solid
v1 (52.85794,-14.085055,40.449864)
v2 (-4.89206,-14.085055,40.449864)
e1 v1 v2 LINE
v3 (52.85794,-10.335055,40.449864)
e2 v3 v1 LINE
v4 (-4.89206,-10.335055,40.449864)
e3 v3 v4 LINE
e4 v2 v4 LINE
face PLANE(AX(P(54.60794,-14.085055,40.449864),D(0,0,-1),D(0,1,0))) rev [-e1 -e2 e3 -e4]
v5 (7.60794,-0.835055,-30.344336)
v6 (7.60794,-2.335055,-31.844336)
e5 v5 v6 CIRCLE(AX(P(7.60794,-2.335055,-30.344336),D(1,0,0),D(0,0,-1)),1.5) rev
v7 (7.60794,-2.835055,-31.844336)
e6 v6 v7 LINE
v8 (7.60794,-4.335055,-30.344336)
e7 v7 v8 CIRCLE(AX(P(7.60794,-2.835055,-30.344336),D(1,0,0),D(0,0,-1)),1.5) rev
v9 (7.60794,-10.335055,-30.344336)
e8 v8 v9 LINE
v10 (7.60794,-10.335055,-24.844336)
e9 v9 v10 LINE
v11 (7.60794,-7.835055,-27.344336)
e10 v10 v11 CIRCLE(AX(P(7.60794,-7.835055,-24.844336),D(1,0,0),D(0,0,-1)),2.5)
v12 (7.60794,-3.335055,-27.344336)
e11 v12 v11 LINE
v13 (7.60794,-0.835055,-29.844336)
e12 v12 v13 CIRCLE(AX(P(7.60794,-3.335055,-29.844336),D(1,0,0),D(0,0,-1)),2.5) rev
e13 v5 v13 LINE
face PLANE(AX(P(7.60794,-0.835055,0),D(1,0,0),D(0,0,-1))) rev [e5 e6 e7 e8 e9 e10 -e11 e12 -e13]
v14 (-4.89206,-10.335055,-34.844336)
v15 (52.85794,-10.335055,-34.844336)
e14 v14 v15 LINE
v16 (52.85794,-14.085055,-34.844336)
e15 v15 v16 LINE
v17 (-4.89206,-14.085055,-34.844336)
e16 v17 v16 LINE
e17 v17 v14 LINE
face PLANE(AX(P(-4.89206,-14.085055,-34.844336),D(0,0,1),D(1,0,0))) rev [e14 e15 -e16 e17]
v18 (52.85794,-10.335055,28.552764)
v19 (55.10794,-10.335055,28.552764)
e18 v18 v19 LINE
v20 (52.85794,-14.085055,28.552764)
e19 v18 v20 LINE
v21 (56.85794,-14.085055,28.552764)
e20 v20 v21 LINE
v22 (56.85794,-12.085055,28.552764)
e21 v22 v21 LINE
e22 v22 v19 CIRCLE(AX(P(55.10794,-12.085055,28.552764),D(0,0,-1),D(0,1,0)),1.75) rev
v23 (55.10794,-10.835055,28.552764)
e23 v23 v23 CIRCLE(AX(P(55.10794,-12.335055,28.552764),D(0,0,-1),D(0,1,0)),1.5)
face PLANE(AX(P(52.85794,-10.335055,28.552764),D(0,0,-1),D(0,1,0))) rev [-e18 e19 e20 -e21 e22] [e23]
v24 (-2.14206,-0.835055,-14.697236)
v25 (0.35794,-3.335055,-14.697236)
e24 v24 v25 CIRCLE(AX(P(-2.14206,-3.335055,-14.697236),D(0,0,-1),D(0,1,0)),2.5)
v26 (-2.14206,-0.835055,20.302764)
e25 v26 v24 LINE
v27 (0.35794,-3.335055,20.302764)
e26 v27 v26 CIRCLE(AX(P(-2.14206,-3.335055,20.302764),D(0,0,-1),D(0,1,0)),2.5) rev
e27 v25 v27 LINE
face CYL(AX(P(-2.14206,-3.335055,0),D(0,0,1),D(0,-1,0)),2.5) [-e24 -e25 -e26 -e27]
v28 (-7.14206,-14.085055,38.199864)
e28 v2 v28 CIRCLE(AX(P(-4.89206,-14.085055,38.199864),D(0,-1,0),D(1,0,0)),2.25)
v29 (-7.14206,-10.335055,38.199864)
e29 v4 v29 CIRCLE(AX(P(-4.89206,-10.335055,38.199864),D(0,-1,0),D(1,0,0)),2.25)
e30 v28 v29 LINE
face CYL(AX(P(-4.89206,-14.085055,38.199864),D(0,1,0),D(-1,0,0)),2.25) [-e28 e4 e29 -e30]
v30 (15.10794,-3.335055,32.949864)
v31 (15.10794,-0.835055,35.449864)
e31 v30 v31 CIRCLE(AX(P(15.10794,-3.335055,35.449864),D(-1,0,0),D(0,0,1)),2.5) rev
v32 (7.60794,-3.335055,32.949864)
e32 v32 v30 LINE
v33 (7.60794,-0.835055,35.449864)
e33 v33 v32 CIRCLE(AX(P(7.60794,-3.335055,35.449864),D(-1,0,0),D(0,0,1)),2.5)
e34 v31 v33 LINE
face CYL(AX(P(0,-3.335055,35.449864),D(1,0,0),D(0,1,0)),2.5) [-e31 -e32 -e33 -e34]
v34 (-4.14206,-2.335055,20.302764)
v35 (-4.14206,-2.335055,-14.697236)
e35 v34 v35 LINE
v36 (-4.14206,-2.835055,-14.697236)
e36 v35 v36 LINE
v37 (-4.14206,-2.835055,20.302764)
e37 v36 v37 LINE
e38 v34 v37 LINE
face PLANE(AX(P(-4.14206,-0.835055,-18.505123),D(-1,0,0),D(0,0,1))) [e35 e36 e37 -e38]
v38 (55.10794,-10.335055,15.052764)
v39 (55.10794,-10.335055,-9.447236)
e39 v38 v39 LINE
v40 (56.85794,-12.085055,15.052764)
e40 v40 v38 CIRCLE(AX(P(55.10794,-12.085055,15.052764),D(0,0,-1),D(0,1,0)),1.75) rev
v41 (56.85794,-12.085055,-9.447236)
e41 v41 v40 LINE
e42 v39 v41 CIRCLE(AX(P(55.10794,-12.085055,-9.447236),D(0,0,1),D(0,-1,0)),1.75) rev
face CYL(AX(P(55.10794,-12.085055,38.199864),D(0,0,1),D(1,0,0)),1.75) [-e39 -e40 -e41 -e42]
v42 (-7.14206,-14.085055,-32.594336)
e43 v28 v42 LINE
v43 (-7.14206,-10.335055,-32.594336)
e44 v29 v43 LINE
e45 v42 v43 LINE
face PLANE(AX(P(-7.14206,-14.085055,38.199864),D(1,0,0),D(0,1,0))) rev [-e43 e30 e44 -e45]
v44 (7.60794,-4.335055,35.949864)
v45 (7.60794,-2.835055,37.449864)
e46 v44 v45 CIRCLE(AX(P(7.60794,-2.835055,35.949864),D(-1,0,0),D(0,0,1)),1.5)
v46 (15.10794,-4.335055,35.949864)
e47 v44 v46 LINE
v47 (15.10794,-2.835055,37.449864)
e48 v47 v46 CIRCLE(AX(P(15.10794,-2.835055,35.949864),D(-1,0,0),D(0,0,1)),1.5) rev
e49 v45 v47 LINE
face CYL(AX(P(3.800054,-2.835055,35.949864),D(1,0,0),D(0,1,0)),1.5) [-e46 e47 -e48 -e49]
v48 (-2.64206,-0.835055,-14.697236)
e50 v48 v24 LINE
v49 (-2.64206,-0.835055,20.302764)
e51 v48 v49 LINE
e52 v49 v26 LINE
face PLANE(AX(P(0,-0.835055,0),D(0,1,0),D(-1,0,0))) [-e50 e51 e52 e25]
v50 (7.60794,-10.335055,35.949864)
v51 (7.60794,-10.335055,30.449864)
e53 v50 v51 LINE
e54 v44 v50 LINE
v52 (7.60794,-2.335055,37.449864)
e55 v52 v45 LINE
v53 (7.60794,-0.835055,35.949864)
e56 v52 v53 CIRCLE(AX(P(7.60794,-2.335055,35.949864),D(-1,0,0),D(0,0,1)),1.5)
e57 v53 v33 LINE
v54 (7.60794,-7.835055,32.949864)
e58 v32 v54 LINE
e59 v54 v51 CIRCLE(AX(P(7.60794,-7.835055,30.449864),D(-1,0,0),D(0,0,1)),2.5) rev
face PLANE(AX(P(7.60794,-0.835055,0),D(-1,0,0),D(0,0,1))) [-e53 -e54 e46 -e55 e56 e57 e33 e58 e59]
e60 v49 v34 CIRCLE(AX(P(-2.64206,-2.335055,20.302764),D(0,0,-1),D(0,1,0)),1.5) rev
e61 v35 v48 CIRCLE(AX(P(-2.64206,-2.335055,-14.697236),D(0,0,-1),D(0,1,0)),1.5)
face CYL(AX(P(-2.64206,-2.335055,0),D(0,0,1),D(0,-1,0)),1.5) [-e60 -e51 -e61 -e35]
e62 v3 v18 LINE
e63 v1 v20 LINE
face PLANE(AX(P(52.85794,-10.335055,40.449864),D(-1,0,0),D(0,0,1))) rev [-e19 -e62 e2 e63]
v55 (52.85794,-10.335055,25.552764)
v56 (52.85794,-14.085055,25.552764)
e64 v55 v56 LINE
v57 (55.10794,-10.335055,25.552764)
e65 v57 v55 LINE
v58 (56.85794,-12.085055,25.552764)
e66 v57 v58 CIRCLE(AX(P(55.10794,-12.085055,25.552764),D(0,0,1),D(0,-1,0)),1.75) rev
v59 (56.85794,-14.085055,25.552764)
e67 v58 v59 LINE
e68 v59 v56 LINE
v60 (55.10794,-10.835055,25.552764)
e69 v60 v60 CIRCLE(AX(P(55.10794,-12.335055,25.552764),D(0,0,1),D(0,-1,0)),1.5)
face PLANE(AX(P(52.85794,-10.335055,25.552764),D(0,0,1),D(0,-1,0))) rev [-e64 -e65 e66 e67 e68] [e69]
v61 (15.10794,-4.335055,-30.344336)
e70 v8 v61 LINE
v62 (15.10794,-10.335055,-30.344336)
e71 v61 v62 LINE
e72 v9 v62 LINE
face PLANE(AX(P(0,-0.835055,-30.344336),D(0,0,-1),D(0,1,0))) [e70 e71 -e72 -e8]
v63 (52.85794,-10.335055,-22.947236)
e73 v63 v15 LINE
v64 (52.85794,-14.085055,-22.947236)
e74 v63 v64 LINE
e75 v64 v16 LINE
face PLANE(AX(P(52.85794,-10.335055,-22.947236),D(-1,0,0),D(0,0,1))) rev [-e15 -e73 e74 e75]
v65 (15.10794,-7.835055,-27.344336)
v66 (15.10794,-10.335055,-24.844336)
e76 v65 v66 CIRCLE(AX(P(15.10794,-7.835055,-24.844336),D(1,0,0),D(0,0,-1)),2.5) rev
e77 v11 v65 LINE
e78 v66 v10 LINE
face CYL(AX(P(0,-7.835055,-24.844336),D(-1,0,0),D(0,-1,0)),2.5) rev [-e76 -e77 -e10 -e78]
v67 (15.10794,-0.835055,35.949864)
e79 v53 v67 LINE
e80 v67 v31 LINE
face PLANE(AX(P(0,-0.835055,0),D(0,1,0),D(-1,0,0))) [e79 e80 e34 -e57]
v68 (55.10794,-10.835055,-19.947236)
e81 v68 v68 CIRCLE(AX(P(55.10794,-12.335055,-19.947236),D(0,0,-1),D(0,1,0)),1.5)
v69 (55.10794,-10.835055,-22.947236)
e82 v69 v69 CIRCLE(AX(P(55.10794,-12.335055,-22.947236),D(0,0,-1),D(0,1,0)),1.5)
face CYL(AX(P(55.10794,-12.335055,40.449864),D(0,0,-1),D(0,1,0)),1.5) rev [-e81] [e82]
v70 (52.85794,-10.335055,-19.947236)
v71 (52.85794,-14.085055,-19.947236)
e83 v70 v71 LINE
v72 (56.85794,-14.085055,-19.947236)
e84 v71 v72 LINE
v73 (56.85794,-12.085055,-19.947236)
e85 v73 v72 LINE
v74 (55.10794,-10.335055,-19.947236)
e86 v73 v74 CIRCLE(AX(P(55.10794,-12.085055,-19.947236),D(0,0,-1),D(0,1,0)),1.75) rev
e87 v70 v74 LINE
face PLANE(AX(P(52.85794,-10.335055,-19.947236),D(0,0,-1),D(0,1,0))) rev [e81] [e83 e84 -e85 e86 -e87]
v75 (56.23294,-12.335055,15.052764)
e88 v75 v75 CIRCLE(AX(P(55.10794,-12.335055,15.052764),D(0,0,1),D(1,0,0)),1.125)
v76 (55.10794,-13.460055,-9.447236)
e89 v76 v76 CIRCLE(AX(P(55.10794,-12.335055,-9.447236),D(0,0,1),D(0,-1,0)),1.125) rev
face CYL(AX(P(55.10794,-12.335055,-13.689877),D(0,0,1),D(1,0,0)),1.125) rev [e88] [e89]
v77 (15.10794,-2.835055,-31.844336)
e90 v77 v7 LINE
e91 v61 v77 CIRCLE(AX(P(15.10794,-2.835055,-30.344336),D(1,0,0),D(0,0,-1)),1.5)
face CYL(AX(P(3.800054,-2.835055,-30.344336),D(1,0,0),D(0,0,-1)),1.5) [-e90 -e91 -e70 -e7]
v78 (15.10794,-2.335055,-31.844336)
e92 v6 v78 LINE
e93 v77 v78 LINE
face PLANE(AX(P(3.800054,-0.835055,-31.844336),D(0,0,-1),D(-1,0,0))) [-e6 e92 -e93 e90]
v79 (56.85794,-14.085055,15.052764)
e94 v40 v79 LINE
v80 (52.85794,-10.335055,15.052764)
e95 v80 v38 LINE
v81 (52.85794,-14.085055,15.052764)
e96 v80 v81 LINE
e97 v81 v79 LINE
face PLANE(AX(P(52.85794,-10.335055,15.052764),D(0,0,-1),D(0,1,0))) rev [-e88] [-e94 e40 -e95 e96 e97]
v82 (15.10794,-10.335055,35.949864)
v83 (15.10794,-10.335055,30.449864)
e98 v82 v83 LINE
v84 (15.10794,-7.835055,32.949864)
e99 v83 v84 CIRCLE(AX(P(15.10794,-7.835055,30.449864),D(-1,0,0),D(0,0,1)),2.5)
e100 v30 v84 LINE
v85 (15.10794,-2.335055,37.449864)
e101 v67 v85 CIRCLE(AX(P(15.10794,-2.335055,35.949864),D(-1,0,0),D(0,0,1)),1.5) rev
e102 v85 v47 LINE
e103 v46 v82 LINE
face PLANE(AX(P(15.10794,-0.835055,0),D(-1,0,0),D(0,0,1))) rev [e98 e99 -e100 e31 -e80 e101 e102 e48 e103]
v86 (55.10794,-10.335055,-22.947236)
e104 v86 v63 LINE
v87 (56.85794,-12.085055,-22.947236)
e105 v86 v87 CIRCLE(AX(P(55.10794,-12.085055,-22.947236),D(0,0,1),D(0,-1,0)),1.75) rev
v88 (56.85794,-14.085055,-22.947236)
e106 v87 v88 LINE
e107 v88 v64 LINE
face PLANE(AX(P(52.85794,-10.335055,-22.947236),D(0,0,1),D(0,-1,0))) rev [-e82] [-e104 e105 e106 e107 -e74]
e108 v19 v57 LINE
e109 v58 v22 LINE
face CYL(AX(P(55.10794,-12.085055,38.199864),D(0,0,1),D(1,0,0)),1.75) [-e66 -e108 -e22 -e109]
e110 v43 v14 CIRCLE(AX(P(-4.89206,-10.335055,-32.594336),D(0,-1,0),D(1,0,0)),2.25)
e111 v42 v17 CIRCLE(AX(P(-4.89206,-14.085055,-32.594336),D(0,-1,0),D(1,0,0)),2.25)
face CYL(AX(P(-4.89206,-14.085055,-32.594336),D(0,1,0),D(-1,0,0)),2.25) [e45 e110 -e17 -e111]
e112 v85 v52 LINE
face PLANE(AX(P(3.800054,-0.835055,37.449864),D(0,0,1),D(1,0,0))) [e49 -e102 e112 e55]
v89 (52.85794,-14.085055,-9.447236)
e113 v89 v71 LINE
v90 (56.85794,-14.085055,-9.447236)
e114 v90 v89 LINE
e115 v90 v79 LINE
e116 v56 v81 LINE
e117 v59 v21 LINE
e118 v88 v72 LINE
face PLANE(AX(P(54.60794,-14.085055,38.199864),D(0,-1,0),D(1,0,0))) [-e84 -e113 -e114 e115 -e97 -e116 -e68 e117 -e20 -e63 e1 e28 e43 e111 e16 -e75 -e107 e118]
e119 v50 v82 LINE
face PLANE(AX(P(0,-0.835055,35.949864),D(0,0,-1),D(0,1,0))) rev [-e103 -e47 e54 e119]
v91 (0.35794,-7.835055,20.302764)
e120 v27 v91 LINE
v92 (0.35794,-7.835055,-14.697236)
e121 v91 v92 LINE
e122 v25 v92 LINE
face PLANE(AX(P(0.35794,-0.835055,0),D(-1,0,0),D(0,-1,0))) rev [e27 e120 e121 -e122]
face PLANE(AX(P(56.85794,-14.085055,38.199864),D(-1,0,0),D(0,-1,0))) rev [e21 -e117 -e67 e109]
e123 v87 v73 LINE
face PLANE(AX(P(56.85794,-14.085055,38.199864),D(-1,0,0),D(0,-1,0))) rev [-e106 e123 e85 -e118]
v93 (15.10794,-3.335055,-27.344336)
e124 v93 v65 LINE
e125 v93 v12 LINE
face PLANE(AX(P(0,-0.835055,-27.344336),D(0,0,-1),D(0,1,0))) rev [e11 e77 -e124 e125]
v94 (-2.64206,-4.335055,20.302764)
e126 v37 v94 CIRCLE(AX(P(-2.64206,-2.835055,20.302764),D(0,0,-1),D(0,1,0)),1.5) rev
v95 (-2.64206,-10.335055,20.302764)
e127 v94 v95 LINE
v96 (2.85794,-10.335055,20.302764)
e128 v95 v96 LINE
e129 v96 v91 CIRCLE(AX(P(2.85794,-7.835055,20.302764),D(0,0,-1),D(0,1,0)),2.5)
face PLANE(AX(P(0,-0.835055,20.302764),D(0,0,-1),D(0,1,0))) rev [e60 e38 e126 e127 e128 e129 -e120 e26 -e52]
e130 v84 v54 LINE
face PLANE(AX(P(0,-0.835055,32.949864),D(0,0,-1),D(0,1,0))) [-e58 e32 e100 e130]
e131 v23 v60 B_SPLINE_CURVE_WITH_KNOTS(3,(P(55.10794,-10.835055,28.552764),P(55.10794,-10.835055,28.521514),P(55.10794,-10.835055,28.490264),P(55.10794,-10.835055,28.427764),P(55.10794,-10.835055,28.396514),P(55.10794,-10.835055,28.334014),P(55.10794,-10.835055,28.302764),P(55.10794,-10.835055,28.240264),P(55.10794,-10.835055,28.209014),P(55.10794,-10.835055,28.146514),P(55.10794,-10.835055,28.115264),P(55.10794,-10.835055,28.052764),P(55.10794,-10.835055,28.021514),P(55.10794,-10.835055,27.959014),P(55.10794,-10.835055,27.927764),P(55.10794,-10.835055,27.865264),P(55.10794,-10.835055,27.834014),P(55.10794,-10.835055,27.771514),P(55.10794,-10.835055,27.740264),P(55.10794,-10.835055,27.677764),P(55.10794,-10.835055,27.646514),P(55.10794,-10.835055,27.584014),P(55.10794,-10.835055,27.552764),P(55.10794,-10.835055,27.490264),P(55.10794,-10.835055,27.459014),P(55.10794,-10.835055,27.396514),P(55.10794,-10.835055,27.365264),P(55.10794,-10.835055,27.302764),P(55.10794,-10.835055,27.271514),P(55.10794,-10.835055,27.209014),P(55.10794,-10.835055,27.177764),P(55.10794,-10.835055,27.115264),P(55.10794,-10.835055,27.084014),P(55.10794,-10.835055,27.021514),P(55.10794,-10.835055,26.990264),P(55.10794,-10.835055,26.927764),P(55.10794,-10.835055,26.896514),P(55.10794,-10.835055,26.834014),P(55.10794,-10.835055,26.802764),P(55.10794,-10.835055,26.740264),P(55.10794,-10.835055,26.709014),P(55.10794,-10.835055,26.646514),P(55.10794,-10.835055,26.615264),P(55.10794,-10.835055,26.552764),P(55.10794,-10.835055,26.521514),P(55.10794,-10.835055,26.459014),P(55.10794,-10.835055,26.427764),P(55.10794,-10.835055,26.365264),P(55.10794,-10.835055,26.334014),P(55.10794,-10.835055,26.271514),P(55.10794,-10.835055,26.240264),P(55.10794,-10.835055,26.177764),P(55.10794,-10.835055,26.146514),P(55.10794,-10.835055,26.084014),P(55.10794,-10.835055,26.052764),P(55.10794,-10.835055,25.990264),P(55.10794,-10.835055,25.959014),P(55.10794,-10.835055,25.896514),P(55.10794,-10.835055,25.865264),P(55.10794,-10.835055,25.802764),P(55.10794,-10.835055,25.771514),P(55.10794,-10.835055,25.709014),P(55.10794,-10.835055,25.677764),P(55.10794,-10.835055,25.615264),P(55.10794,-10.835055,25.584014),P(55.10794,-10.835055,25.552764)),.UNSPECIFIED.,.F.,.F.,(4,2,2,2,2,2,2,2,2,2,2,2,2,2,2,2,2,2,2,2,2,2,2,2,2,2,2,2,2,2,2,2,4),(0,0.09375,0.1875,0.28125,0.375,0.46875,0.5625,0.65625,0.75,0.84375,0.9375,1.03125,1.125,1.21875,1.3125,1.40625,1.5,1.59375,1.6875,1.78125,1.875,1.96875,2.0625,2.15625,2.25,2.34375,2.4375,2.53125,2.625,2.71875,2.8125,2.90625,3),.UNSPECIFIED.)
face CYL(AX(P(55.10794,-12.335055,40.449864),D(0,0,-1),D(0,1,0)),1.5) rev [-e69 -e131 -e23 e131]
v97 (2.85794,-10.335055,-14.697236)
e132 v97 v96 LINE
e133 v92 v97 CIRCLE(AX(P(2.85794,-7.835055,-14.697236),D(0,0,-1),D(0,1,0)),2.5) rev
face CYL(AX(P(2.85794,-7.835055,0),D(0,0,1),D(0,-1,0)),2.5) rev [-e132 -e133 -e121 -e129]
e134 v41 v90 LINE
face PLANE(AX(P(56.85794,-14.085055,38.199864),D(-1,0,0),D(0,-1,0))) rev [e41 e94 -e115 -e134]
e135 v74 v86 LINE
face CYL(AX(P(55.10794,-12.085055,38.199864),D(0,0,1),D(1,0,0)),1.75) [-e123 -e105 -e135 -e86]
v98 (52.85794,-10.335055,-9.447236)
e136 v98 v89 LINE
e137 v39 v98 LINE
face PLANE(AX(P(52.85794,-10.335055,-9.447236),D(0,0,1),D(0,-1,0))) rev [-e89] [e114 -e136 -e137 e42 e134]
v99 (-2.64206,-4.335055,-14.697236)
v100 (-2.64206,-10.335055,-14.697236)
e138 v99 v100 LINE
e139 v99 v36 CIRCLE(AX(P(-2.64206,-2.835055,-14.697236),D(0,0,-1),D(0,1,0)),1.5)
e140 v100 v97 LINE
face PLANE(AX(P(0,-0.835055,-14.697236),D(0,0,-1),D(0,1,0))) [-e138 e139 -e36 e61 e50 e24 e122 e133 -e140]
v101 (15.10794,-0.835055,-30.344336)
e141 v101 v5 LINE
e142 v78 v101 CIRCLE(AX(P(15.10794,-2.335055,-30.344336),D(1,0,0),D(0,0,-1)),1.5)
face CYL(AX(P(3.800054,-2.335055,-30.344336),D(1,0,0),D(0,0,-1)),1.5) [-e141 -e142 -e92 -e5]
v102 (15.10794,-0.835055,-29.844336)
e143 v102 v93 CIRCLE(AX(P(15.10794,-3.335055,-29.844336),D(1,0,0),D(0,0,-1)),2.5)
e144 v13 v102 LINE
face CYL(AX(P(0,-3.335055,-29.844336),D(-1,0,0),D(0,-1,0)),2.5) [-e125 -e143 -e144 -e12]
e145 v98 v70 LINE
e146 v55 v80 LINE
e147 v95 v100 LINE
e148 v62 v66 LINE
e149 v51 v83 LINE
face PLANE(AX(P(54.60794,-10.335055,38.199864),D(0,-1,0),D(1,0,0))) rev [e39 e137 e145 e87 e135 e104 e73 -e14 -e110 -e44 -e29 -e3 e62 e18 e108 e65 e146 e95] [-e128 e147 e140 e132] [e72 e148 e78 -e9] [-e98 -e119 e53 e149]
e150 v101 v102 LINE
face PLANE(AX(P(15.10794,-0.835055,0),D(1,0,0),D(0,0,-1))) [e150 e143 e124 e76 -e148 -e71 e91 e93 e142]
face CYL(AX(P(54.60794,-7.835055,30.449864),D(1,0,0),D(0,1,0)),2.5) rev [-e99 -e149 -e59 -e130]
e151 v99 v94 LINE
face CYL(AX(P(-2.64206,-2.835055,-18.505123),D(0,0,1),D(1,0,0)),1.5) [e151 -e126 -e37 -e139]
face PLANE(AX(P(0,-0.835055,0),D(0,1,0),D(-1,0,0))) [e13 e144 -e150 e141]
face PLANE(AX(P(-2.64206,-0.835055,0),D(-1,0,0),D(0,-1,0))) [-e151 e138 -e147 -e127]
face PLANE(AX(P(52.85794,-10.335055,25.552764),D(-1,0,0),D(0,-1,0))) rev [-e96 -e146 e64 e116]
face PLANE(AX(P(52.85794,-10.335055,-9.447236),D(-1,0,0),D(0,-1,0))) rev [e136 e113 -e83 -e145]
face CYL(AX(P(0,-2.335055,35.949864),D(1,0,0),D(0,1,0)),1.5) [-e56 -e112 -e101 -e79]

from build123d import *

# Parameters (mm, degrees)
EXTRUDE_START       = 0.25
EXTRUDE_BASE_DEPTH  = 3.75
FILLET1_R           = 1.75
SKETCH2_W           = 4
SKETCH2_H           = 10.5
SKETCH2_H_2         = 11.8971
CUT_EXTRUDE2_DEPTH  = 70.879033956
SKETCH4_R           = 1.5
CUT_EXTRUDE3_DEPTH  = 87.315736962
SKETCH6_W           = 3
SKETCH6_H           = 17.5
SKETCH6_W_2         = 7.5
SKETCH6_H_2         = 3
BOSS_EXTRUDE2_DEPTH = 9.5
SKETCH7_W           = 1.5
SKETCH7_H           = 3.5
BOSS_EXTRUDE3_DEPTH = 35
SKETCH8_W           = 1.5
SKETCH8_H           = 3.5
BOSS_EXTRUDE4_DEPTH = 7.5
SKETCH9_W           = 1.5
SKETCH9_H           = 3.5
BOSS_EXTRUDE5_DEPTH = 7.5
FILLET2_R           = 1.5
FILLET3_R           = 2.5
BOSS_EXTRUDE6_START = -24.5
SKETCH11_R          = 1.5
SKETCH11_R_2        = 1.125
BOSS_EXTRUDE6_DEPTH = 24.5


# Some blends are built 0.0001 mm under size
with BuildPart() as part:
    # Sketch1 → Extrude Base (new body)
    with BuildSketch(Plane.XZ.offset(10.085054916).offset(EXTRUDE_START)):
        with BuildLine():
            Line((56.857940404, 38.199863775), (56.857940404, -32.594336225))
            ThreePointArc((56.857940404, -32.594336225), (56.198930662, -34.185326483), (54.607940404, -34.844336225))
            Line((54.607940404, -34.844336225), (-4.892059596, -34.844336225))
            ThreePointArc((-4.892059596, -34.844336225), (-6.483049854, -34.185326483), (-7.142059596, -32.594336225))
            Line((-7.142059596, -32.594336225), (-7.142059596, 38.199863775))
            ThreePointArc((-7.142059596, 38.199863775), (-6.483049854, 39.790854032), (-4.892059596, 40.449863775))
            Line((-4.892059596, 40.449863775), (54.607940404, 40.449863775))
            ThreePointArc((54.607940404, 40.449863775), (56.198930662, 39.790854032), (56.857940404, 38.199863775))
        make_face()
    extrude(amount=EXTRUDE_BASE_DEPTH)

    # Fillet1
    # the kernel refuses this fillet: 1.75 mm, written as the material it takes off along each edge
    with BuildSketch(Plane(origin=(56.857940404, -10.335054916, 42.574863775), x_dir=(0, -1, 0), z_dir=(0, 0, -1))) as fillet1_piece_1:
        with BuildLine():
            CenterArc((FILLET1_R, FILLET1_R), FILLET1_R, 180, 90)
            Line((0, FILLET1_R), (0, 0))
            Line((0, 0), (FILLET1_R, 0))
        make_face()
    extrude(amount=79.5442, mode=Mode.SUBTRACT)

    # Sketch2 → Cut-Extrude2 (cut, through all)
    with BuildSketch(Plane.XZ.offset(14.085054916)):
        with Locations((54.857940404, 20.302763775)):
            Rectangle(SKETCH2_W, SKETCH2_H)
        with Locations((54.857940404, -14.697236225)):
            Rectangle(SKETCH2_W, SKETCH2_H)
        with Locations((54.857940404, -28.895786225)):
            Rectangle(SKETCH2_W, SKETCH2_H_2)
        with Locations((54.857940404, 34.501313775)):
            Rectangle(SKETCH2_W, SKETCH2_H_2)
    extrude(amount=-CUT_EXTRUDE2_DEPTH, mode=Mode.SUBTRACT)

    # Sketch4 → Cut-Extrude3 (cut, through all)
    with BuildSketch(Plane(origin=(0, 0, -22.947236225), x_dir=(-1, 0, 0), z_dir=(0, 0, -1))):
        with Locations(Location((-55.107940404, -12.335054916, 0), (0, 0, 90))):
            Circle(SKETCH4_R)
    extrude(amount=-CUT_EXTRUDE3_DEPTH, mode=Mode.SUBTRACT)

    # Sketch6 → Boss-Extrude2 (add)
    with BuildSketch(Plane(origin=(0, -10.335054916, 0), x_dir=(1, 0, 0), z_dir=(0, 1, 0))):
        with Locations((-1.142059596, -11.552763775)):
            Rectangle(SKETCH6_W, SKETCH6_H)
        with Locations((-1.142059596, 5.947236225)):
            Rectangle(SKETCH6_W, SKETCH6_H)
        with Locations((11.357940404, 28.844336225)):
            Rectangle(SKETCH6_W_2, SKETCH6_H_2)
        with Locations((11.357940404, -34.449863775)):
            Rectangle(SKETCH6_W_2, SKETCH6_H_2)
    extrude(amount=BOSS_EXTRUDE2_DEPTH)

    # Sketch7 → Boss-Extrude3 (add)
    with BuildSketch(Plane.XY.offset(20.302763775)):
        with Locations((-3.392059596, -2.585054916)):
            Rectangle(SKETCH7_W, SKETCH7_H)
    extrude(amount=-BOSS_EXTRUDE3_DEPTH)

    # Sketch8 → Boss-Extrude4 (add)
    with BuildSketch(Plane(origin=(15.107940404, 0, 0), x_dir=(0, 0, -1), z_dir=(1, 0, 0))):
        with Locations((31.094336225, -2.585054916)):
            Rectangle(SKETCH8_W, SKETCH8_H)
    extrude(amount=-BOSS_EXTRUDE4_DEPTH)

    # Sketch9 → Boss-Extrude5 (add)
    with BuildSketch(Plane(origin=(15.107940404, 0, 0), x_dir=(0, 0, -1), z_dir=(1, 0, 0))):
        with Locations((-36.699863775, -2.585054916)):
            Rectangle(SKETCH9_W, SKETCH9_H)
    extrude(amount=-BOSS_EXTRUDE5_DEPTH)

    # Fillet2
    fillet2_edges = [part.edges().sort_by_distance(p)[0] for p in [
        (11.357940404, -0.835054916, -31.844336225),
        (11.357940404, -4.335054916, -31.844336225),
        (-4.142059596, -0.835054916, 2.802763775),
        (-4.142059596, -4.335054916, 2.802763775),
        (11.357940404, -0.835054916, 37.449863775),
        (11.357940404, -4.335054916, 37.449863775),
    ]]
    fillet(fillet2_edges, radius=FILLET2_R - 0.0001)  # a hair under: the kernel refuses the full size

    # Fillet3
    fillet3_edges = [part.edges().sort_by_distance(p)[0] for p in [
        (0.357940404, -10.335054916, 2.802763775),
        (0.357940404, -0.835054916, 2.802763775),
        (11.357940404, -10.335054916, -27.344336225),
        (11.357940404, -0.835054916, -27.344336225),
        (11.357940404, -0.835054916, 32.949863775),
        (11.357940404, -10.335054916, 32.949863775),
    ]]
    fillet(fillet3_edges, radius=FILLET3_R)

    # Sketch11 → Boss-Extrude6 (add)
    with BuildSketch(Plane.XY.offset(15.052763775).offset(BOSS_EXTRUDE6_START)):
        with Locations(Location((55.107940404, -12.335054916, 0), (0, 0, 90))):
            Circle(SKETCH11_R)
        with Locations((55.107940404, -12.335054916)):
            Circle(SKETCH11_R_2, mode=Mode.SUBTRACT)
    extrude(amount=BOSS_EXTRUDE6_DEPTH)


solid = part.part
